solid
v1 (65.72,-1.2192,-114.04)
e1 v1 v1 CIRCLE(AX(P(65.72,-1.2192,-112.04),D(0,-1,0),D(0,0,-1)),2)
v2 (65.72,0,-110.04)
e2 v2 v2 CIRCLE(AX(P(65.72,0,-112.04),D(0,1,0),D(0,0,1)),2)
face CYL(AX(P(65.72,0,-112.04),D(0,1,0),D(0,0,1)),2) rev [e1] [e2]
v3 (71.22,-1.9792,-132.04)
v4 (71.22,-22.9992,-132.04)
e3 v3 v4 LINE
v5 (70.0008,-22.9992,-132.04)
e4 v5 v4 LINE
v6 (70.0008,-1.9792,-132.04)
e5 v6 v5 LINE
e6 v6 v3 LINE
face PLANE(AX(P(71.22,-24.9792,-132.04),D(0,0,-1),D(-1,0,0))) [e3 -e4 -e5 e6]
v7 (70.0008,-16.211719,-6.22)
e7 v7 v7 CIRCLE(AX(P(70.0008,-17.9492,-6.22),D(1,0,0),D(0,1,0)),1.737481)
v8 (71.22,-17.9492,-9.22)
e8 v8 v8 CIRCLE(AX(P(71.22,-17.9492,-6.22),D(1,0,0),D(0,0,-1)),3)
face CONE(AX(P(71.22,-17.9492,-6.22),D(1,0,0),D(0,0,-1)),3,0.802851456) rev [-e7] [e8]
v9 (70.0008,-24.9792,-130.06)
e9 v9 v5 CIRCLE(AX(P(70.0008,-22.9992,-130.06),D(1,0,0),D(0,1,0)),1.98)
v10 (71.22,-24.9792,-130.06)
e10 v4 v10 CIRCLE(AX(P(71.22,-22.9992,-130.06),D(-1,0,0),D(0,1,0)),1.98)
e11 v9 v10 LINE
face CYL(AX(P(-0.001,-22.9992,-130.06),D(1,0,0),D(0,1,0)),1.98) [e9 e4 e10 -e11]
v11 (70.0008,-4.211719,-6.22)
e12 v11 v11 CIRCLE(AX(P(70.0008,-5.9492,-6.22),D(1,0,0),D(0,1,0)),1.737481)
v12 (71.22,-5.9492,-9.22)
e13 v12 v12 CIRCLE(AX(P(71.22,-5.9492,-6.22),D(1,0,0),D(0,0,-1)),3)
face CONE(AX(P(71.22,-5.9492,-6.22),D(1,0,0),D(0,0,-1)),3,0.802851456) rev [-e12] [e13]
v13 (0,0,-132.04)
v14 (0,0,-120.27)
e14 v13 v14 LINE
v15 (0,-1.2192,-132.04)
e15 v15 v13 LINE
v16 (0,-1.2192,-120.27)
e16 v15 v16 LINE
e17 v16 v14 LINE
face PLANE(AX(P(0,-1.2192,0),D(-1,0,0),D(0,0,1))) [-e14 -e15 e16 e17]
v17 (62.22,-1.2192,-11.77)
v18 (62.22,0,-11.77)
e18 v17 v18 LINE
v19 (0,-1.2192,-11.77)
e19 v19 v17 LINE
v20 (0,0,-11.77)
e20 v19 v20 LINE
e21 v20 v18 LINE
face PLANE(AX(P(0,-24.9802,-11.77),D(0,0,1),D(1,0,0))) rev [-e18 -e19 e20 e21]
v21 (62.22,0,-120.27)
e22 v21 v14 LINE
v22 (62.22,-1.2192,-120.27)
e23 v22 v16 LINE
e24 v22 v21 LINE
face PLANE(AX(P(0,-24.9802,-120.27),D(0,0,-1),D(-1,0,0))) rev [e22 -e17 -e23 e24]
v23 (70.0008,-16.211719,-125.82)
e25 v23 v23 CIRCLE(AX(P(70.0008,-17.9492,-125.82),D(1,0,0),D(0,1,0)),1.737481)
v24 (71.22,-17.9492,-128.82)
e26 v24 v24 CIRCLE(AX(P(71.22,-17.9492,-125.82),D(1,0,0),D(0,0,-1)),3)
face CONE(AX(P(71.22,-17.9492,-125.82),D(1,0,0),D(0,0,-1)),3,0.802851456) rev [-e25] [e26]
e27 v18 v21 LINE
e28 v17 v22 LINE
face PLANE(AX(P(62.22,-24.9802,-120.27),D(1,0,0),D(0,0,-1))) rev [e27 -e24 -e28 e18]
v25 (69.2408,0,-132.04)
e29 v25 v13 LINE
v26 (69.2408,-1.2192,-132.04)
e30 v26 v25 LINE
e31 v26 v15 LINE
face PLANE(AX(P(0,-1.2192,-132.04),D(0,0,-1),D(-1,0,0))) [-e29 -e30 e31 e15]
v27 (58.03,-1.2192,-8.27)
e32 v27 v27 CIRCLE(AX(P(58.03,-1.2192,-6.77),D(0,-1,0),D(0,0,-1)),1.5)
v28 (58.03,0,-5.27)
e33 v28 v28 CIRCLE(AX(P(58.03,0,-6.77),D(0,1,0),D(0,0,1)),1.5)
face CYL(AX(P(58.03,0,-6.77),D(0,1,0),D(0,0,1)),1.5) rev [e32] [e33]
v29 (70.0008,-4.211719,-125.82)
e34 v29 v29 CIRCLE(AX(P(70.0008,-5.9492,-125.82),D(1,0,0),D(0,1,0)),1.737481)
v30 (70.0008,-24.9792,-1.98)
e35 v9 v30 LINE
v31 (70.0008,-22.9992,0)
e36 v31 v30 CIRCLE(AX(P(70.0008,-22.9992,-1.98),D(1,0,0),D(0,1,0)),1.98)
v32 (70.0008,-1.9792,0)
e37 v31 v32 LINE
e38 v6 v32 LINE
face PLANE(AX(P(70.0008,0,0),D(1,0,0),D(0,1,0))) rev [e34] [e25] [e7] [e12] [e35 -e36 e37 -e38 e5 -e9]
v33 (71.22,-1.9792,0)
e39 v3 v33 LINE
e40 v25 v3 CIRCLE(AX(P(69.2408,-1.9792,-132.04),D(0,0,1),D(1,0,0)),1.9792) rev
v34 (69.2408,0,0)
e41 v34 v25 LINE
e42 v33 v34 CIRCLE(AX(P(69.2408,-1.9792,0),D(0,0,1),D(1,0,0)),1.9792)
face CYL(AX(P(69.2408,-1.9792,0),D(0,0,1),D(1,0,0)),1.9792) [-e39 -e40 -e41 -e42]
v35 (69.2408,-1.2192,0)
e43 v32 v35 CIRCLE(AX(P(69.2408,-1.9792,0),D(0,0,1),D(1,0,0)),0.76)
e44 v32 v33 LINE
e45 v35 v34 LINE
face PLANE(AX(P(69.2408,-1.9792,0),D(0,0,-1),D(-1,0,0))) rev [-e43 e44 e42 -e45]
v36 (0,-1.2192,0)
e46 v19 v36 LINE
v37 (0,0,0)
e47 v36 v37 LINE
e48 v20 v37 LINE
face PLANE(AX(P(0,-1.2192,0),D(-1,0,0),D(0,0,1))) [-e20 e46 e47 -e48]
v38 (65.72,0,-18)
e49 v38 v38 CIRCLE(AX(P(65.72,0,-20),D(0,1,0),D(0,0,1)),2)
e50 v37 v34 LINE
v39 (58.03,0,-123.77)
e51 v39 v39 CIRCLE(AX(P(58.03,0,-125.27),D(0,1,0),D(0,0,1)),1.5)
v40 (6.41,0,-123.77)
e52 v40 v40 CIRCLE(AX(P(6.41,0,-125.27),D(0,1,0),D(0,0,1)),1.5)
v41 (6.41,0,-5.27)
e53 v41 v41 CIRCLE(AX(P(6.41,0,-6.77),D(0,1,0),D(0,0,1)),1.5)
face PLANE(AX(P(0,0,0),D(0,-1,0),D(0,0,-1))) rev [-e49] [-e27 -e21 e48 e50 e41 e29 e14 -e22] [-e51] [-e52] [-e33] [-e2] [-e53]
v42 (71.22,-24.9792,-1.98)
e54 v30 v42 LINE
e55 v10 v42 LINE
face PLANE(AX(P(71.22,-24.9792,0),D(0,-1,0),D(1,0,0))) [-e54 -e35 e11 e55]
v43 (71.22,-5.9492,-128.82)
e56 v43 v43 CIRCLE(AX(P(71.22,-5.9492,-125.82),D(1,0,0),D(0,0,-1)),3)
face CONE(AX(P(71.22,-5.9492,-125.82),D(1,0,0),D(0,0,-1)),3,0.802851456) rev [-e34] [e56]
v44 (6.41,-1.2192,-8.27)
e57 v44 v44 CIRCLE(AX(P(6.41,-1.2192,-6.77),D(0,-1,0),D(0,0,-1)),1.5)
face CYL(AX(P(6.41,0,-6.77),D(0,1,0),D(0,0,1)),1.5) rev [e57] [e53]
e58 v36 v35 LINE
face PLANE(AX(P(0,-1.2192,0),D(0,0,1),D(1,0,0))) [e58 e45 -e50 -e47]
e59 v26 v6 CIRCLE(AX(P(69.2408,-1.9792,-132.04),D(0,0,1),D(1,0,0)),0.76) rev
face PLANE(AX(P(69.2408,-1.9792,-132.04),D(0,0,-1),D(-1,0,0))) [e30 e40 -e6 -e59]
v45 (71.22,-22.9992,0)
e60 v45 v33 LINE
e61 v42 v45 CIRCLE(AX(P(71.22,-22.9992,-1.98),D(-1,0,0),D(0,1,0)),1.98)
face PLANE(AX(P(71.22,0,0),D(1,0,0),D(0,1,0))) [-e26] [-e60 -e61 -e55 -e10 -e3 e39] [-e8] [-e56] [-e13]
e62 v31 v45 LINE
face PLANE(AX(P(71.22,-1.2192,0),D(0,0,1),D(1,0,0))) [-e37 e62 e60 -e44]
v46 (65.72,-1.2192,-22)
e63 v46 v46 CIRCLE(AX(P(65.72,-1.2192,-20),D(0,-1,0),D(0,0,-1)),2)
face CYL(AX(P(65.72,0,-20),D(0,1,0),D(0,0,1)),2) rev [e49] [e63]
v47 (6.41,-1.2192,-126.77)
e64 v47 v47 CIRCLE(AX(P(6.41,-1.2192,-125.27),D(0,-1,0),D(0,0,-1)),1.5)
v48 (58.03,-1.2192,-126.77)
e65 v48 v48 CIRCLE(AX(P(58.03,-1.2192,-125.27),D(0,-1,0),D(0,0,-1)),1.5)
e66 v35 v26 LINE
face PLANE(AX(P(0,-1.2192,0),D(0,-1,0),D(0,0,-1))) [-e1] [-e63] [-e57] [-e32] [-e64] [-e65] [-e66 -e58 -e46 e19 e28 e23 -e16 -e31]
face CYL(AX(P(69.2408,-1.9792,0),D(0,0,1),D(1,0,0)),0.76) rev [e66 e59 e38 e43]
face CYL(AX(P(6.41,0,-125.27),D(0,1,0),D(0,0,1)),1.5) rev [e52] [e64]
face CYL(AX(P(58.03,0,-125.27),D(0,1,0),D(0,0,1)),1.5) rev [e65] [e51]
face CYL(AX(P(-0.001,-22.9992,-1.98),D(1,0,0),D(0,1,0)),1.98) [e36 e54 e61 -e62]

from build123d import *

# Parameters (mm, degrees)
SKETCH1_W                                            = 71.22
SKETCH1_H                                            = 132.04
BASE_FLANGE1_DEPTH                                   = 1.2192
EDGE_FLANGE1_STRIP_W                                 = 6.3968
EDGE_FLANGE1_STRIP_H                                 = 1.2192
EDGE_FLANGE1_STRIP_CUT_DEPTH                         = 132.04
EDGE_FLANGE1_DEPTH                                   = 132.04
CUT_EXTRUDE2_REACH                                   = 154.088
SKETCH28_W                                           = 62.22
SKETCH28_H                                           = 108.5
CSK_FOR_M3_CROSS_COUNTERSUNK_HEAD_SCREW4_D           = 3.4
CSK_FOR_M3_CROSS_COUNTERSUNK_HEAD_SCREW4_CSINK_D     = 6
CSK_FOR_M3_CROSS_COUNTERSUNK_HEAD_SCREW4_CSINK_ANGLE = 92
F_3_0MM_DOWEL_HOLE1_D                                = 3
CUT_EXTRUDE3_REACH                                   = 154.088
F_4_0MM_DOWEL_HOLE1_D                                = 4


# Sheet-metal steps are written as plain solids
with BuildPart() as part:
    # Sketch1 → Base-Flange1 (new body)
    with BuildSketch(Plane(origin=(0, 0, 0), x_dir=(1, 0, 0), z_dir=(0, 1, 0))):
        with Locations((35.61, 66.02)):
            Rectangle(SKETCH1_W, SKETCH1_H)
    extrude(amount=-BASE_FLANGE1_DEPTH)

    # Edge-Flange1 strip (across the edge) → Edge-Flange1 strip cut (cut)
    with BuildSketch(Plane(origin=(71.22, -1.2192, -132.04), x_dir=(-1, 0, 0), z_dir=(0, 0, 1))):
        with Locations((-1.2192, -0.6096)):
            Rectangle(EDGE_FLANGE1_STRIP_W, EDGE_FLANGE1_STRIP_H)
    extrude(amount=EDGE_FLANGE1_STRIP_CUT_DEPTH, mode=Mode.SUBTRACT)

    # Edge-Flange1 section (across the edge) → Edge-Flange1 (add)
    with BuildSketch(Plane(origin=(71.22, -1.2192, -132.04), x_dir=(-1, 0, 0), z_dir=(0, 0, 1))):
        with BuildLine():
            Line((0, 0.76), (0, 23.76))
            Line((0, 23.76), (1.2192, 23.76))
            Line((1.2192, 23.76), (1.2192, 0.76))
            ThreePointArc((1.2192, 0.76), (1.441798846, 0.222598846), (1.9792, 0))
            Line((1.9792, 0), (1.9792, -1.2192))
            ThreePointArc((1.9792, -1.2192), (0.579694259, -0.639505741), (0, 0.76))
        make_face()
    extrude(amount=EDGE_FLANGE1_DEPTH)

    # Sketch28 → Cut-Extrude2 (cut, up to next)
    with BuildSketch(Plane(origin=(0, 0, 0), x_dir=(1, 0, 0), z_dir=(0, 1, 0)), mode=Mode.PRIVATE) as cut_extrude2_sk1:
        with Locations((31.11, 66.02)):
            Rectangle(SKETCH28_W, SKETCH28_H)
    cut_extrude2_tool1 = extrude(cut_extrude2_sk1.sketch, amount=-CUT_EXTRUDE2_REACH, mode=Mode.PRIVATE) & part.part
    add(cut_extrude2_tool1.solids().sort_by_distance((31.11, 0, -66.02))[0], mode=Mode.SUBTRACT)

    # CSK for M3 Cross Countersunk Head Screw4 (through all)
    with Locations(Plane(origin=(71.22, -5.9492, -6.22), x_dir=(0, 1, 0), z_dir=(1, 0, 0))):
        with Locations((0, 0), (-12, 0), (0, -119.6), (-12, -119.6)):
            CounterSinkHole(CSK_FOR_M3_CROSS_COUNTERSUNK_HEAD_SCREW4_D / 2, CSK_FOR_M3_CROSS_COUNTERSUNK_HEAD_SCREW4_CSINK_D / 2, counter_sink_angle=CSK_FOR_M3_CROSS_COUNTERSUNK_HEAD_SCREW4_CSINK_ANGLE)

    # Ø3.0mm Dowel Hole1 (through all)
    with Locations(Plane(origin=(6.41, 0, -125.27), x_dir=(0, 0, 1), z_dir=(0, 1, 0))):
        with Locations((0, 0), (0, 51.62), (118.5, 51.62), (118.5, 0)):
            Hole(F_3_0MM_DOWEL_HOLE1_D / 2)

    # Sketch35 → Cut-Extrude3 (cut, up to next)
    with BuildSketch(Plane(origin=(71.22, 0, 0), x_dir=(0, 0, -1), z_dir=(1, 0, 0)), mode=Mode.PRIVATE) as cut_extrude3_sk1:
        with BuildLine():
            Line((0, -24.9792), (1.98, -24.9792))
            ThreePointArc((1.98, -24.9792), (0.579928573, -24.399271427), (0, -22.9992))
            Line((0, -22.9992), (0, -24.9792))
        make_face()
    cut_extrude3_tool1 = extrude(cut_extrude3_sk1.sketch, amount=-CUT_EXTRUDE3_REACH, mode=Mode.PRIVATE) & part.part
    # Sketch35 → Cut-Extrude3 (cut, up to next)
    with BuildSketch(Plane(origin=(71.22, 0, 0), x_dir=(0, 0, -1), z_dir=(1, 0, 0)), mode=Mode.PRIVATE) as cut_extrude3_sk2:
        with BuildLine():
            Line((132.04, -24.9792), (130.06, -24.9792))
            ThreePointArc((130.06, -24.9792), (131.460071427, -24.399271427), (132.04, -22.9992))
            Line((132.04, -22.9992), (132.04, -24.9792))
        make_face()
    cut_extrude3_tool2 = extrude(cut_extrude3_sk2.sketch, amount=-CUT_EXTRUDE3_REACH, mode=Mode.PRIVATE) & part.part
    add(cut_extrude3_tool1.solids().sort_by_distance((71.22, -24.536931, -0.442269))[0], mode=Mode.SUBTRACT)
    add(cut_extrude3_tool2.solids().sort_by_distance((71.22, -24.536931, -131.597731))[0], mode=Mode.SUBTRACT)

    # Ø4.0mm Dowel Hole1 (through all)
    with Locations(Plane(origin=(0, 0, 0), x_dir=(1, 0, 0), z_dir=(0, 1, 0))):
        with Locations((65.72, 112.04), (65.72, 20)):
            Hole(F_4_0MM_DOWEL_HOLE1_D / 2)


solid = part.part
